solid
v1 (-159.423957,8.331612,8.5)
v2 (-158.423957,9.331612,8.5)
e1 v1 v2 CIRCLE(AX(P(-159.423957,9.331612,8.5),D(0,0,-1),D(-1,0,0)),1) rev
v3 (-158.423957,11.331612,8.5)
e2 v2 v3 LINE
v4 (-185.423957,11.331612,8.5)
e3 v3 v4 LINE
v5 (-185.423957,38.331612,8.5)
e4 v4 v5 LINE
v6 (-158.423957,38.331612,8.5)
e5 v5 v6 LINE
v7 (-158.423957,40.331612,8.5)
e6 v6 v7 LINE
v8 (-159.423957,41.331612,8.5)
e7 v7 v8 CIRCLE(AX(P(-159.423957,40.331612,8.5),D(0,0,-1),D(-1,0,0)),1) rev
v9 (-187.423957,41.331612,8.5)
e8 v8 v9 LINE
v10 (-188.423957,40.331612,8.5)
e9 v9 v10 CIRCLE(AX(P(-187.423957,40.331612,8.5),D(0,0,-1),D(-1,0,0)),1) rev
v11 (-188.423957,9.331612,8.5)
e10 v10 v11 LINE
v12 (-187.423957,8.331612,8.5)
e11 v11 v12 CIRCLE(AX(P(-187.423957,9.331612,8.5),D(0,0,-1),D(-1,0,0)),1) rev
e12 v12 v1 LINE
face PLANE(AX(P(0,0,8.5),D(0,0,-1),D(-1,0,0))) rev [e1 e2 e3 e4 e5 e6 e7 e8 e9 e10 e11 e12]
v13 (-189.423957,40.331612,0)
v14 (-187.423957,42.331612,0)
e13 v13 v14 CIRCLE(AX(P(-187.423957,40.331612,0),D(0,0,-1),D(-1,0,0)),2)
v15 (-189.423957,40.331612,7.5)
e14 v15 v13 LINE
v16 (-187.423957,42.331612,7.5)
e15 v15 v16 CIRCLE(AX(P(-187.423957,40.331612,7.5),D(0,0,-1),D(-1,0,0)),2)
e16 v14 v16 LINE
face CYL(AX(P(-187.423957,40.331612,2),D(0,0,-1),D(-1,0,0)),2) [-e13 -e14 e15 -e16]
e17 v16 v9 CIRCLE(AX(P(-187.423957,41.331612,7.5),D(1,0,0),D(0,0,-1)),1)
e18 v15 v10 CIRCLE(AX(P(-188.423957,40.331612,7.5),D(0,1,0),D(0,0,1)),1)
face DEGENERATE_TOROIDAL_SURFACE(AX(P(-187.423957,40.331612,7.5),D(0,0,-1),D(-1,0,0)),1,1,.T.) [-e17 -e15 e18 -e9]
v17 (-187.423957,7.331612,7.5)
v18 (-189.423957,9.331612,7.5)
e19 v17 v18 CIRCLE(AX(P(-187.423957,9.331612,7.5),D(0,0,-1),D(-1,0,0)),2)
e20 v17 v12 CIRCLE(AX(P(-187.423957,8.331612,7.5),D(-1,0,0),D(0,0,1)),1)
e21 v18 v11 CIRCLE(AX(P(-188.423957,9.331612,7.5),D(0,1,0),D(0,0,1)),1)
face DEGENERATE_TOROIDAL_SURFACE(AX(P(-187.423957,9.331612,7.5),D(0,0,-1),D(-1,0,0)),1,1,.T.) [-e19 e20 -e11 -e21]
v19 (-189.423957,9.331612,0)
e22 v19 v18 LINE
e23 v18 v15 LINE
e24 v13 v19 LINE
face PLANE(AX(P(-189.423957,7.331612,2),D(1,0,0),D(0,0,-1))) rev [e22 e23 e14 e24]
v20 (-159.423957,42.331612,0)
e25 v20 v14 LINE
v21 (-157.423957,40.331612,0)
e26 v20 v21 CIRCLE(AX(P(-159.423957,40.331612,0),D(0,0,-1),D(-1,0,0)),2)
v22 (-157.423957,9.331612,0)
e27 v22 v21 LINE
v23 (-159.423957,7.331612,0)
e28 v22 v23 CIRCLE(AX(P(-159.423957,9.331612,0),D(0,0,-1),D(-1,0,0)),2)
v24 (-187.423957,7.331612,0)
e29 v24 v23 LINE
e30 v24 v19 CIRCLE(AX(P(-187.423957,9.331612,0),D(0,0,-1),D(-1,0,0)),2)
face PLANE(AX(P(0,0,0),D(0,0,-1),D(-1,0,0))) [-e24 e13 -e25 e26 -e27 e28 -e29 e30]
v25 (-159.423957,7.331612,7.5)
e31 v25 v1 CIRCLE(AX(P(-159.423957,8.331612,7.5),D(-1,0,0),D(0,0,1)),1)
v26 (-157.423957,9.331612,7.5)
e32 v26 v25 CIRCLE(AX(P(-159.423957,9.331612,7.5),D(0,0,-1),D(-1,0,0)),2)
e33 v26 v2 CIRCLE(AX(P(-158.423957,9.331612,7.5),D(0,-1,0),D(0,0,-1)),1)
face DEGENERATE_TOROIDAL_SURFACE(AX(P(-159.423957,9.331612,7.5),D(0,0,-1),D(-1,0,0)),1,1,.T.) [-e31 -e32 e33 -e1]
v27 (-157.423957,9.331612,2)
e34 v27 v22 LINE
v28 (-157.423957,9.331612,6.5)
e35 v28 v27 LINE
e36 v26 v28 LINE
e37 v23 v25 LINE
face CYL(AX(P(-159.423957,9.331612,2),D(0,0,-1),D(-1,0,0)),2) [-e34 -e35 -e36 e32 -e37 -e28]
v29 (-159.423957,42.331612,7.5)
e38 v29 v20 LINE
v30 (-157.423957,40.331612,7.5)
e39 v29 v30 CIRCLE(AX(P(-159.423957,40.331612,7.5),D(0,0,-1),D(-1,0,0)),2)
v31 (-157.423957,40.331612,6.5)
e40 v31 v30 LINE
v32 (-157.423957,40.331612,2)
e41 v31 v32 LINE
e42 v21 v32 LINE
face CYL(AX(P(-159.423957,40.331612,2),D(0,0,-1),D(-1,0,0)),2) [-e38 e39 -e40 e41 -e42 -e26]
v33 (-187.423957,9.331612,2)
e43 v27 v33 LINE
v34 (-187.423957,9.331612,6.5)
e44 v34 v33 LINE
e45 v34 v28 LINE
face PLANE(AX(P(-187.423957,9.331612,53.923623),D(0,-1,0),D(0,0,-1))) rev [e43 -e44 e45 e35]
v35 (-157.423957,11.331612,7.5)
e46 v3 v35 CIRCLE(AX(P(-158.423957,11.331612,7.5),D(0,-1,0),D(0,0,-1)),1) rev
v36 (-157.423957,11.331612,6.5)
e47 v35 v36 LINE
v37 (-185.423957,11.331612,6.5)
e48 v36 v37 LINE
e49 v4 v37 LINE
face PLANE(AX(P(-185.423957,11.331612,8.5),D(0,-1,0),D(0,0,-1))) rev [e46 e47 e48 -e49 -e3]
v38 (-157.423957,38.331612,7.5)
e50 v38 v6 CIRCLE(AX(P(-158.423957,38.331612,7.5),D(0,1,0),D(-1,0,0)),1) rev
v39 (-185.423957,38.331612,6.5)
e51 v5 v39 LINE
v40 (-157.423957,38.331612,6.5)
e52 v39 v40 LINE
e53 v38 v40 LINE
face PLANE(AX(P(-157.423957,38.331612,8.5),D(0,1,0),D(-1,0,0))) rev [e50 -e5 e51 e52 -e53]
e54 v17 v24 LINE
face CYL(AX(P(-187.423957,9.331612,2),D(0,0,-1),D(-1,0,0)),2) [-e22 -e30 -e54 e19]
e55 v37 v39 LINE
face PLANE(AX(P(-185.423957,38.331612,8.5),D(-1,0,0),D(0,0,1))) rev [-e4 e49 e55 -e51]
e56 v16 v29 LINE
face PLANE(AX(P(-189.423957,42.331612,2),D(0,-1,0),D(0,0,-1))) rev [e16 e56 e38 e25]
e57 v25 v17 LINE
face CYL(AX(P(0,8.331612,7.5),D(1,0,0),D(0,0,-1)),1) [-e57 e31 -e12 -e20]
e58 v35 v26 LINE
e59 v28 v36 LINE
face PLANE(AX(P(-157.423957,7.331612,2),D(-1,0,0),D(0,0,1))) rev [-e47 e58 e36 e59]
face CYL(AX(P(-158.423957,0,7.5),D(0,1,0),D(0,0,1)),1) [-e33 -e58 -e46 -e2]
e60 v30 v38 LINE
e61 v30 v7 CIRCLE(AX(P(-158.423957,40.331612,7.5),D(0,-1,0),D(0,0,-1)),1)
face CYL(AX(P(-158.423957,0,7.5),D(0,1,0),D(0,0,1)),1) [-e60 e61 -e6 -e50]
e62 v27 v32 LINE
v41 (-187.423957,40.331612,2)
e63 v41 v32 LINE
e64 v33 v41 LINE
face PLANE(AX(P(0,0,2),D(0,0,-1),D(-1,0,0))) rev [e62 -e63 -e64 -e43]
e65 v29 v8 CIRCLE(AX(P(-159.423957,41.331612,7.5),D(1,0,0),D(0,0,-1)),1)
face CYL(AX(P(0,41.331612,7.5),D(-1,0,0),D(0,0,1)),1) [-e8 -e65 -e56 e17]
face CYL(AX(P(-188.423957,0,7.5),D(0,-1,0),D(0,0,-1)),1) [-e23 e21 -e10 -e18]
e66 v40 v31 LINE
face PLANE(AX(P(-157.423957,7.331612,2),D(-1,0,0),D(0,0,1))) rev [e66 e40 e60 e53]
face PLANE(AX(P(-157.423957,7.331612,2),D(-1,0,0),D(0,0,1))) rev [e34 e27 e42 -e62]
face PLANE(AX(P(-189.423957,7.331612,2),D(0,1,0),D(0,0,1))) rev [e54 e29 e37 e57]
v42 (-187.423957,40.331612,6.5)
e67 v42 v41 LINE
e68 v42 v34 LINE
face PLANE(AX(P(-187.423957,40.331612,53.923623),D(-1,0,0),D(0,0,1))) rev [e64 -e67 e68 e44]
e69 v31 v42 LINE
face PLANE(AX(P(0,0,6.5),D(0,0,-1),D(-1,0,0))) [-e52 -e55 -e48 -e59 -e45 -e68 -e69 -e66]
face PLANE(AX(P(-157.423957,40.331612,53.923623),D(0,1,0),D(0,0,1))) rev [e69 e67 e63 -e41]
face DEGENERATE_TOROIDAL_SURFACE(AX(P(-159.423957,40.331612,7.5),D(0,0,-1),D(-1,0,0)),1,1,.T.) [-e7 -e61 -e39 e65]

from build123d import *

# Parameters (mm, degrees)
SKETCH1_W           = 32
SKETCH1_H           = 35
BOSS_EXTRUDE1_DEPTH = 2
BOSS_EXTRUDE2_DEPTH = 4.5
BOSS_EXTRUDE3_DEPTH = 2
FILLET1_START       = -1
FILLET1_DEPTH       = 10
FILLET2_R           = 1


with BuildPart() as part:
    # Sketch1 → Boss-Extrude1 (new body)
    with BuildSketch(Plane.XY):
        with Locations((-173.423957437, 24.831611866)):
            Rectangle(SKETCH1_W, SKETCH1_H)
    extrude(amount=BOSS_EXTRUDE1_DEPTH)

    # Sketch2 → Boss-Extrude2 (add)
    with BuildSketch(Plane.XY.offset(2)):
        Polygon((-157.423957437, 42.331611866), (-189.423957437, 42.331611866), (-189.423957437, 7.331611866), (-157.423957437, 7.331611866), (-157.423957437, 9.331611866), (-187.423957437, 9.331611866), (-187.423957437, 40.331611866), (-157.423957437, 40.331611866), align=None)
    extrude(amount=BOSS_EXTRUDE2_DEPTH)

    # Sketch3 → Boss-Extrude3 (add)
    with BuildSketch(Plane.XY.offset(6.5)):
        Polygon((-157.423957437, 42.331611866), (-189.423957437, 42.331611866), (-189.423957437, 7.331611866), (-157.423957437, 7.331611866), (-157.423957437, 11.331611866), (-185.423957437, 11.331611866), (-185.423957437, 38.331611866), (-157.423957437, 38.331611866), align=None)
    extrude(amount=BOSS_EXTRUDE3_DEPTH)

    # Fillet1: read off the stored shape, not the designer's step
    # Fillet1 outline → Fillet1 (cut)
    with BuildSketch(Plane.XY.offset(FILLET1_START)):
        with BuildLine():
            Line((-157.423957437, 42.331611866), (-159.423957437, 42.331611866))
            ThreePointArc((-159.423957437, 42.331611866), (-158.009743875, 41.745825428), (-157.423957437, 40.331611866))
            Line((-157.423957437, 40.331611866), (-157.423957437, 42.331611866))
        make_face()
        with BuildLine():
            ThreePointArc((-189.423957437, 40.331611866), (-188.838170999, 41.745825428), (-187.423957437, 42.331611866))
            Line((-187.423957437, 42.331611866), (-189.423957437, 42.331611866))
            Line((-189.423957437, 42.331611866), (-189.423957437, 40.331611866))
        make_face()
        with BuildLine():
            ThreePointArc((-187.423957437, 7.331611866), (-188.838170999, 7.917398304), (-189.423957437, 9.331611866))
            Line((-189.423957437, 9.331611866), (-189.423957437, 7.331611866))
            Line((-189.423957437, 7.331611866), (-187.423957437, 7.331611866))
        make_face()
        with BuildLine():
            Line((-157.423957437, 7.331611866), (-157.423957437, 9.331611866))
            ThreePointArc((-157.423957437, 9.331611866), (-158.009743875, 7.917398303), (-159.423957437, 7.331611866))
            Line((-159.423957437, 7.331611866), (-157.423957437, 7.331611866))
        make_face()
    extrude(amount=FILLET1_DEPTH, mode=Mode.SUBTRACT)

    # Fillet2
    fillet2_edges = [part.edges().sort_by_distance(p)[0] for p in [
        (-157.423957437, 10.331611866, 8.5),
        (-158.009743875, 41.745825428, 8.5),
        (-173.423957437, 42.331611866, 8.5),
        (-188.838170999, 41.745825428, 8.5),
        (-158.009743875, 7.917398303, 8.5),
        (-173.423957437, 7.331611866, 8.5),
        (-188.838170999, 7.917398304, 8.5),
        (-189.423957437, 24.831611866, 8.5),
    ]]
    fillet(fillet2_edges, radius=FILLET2_R)


solid = part.part
